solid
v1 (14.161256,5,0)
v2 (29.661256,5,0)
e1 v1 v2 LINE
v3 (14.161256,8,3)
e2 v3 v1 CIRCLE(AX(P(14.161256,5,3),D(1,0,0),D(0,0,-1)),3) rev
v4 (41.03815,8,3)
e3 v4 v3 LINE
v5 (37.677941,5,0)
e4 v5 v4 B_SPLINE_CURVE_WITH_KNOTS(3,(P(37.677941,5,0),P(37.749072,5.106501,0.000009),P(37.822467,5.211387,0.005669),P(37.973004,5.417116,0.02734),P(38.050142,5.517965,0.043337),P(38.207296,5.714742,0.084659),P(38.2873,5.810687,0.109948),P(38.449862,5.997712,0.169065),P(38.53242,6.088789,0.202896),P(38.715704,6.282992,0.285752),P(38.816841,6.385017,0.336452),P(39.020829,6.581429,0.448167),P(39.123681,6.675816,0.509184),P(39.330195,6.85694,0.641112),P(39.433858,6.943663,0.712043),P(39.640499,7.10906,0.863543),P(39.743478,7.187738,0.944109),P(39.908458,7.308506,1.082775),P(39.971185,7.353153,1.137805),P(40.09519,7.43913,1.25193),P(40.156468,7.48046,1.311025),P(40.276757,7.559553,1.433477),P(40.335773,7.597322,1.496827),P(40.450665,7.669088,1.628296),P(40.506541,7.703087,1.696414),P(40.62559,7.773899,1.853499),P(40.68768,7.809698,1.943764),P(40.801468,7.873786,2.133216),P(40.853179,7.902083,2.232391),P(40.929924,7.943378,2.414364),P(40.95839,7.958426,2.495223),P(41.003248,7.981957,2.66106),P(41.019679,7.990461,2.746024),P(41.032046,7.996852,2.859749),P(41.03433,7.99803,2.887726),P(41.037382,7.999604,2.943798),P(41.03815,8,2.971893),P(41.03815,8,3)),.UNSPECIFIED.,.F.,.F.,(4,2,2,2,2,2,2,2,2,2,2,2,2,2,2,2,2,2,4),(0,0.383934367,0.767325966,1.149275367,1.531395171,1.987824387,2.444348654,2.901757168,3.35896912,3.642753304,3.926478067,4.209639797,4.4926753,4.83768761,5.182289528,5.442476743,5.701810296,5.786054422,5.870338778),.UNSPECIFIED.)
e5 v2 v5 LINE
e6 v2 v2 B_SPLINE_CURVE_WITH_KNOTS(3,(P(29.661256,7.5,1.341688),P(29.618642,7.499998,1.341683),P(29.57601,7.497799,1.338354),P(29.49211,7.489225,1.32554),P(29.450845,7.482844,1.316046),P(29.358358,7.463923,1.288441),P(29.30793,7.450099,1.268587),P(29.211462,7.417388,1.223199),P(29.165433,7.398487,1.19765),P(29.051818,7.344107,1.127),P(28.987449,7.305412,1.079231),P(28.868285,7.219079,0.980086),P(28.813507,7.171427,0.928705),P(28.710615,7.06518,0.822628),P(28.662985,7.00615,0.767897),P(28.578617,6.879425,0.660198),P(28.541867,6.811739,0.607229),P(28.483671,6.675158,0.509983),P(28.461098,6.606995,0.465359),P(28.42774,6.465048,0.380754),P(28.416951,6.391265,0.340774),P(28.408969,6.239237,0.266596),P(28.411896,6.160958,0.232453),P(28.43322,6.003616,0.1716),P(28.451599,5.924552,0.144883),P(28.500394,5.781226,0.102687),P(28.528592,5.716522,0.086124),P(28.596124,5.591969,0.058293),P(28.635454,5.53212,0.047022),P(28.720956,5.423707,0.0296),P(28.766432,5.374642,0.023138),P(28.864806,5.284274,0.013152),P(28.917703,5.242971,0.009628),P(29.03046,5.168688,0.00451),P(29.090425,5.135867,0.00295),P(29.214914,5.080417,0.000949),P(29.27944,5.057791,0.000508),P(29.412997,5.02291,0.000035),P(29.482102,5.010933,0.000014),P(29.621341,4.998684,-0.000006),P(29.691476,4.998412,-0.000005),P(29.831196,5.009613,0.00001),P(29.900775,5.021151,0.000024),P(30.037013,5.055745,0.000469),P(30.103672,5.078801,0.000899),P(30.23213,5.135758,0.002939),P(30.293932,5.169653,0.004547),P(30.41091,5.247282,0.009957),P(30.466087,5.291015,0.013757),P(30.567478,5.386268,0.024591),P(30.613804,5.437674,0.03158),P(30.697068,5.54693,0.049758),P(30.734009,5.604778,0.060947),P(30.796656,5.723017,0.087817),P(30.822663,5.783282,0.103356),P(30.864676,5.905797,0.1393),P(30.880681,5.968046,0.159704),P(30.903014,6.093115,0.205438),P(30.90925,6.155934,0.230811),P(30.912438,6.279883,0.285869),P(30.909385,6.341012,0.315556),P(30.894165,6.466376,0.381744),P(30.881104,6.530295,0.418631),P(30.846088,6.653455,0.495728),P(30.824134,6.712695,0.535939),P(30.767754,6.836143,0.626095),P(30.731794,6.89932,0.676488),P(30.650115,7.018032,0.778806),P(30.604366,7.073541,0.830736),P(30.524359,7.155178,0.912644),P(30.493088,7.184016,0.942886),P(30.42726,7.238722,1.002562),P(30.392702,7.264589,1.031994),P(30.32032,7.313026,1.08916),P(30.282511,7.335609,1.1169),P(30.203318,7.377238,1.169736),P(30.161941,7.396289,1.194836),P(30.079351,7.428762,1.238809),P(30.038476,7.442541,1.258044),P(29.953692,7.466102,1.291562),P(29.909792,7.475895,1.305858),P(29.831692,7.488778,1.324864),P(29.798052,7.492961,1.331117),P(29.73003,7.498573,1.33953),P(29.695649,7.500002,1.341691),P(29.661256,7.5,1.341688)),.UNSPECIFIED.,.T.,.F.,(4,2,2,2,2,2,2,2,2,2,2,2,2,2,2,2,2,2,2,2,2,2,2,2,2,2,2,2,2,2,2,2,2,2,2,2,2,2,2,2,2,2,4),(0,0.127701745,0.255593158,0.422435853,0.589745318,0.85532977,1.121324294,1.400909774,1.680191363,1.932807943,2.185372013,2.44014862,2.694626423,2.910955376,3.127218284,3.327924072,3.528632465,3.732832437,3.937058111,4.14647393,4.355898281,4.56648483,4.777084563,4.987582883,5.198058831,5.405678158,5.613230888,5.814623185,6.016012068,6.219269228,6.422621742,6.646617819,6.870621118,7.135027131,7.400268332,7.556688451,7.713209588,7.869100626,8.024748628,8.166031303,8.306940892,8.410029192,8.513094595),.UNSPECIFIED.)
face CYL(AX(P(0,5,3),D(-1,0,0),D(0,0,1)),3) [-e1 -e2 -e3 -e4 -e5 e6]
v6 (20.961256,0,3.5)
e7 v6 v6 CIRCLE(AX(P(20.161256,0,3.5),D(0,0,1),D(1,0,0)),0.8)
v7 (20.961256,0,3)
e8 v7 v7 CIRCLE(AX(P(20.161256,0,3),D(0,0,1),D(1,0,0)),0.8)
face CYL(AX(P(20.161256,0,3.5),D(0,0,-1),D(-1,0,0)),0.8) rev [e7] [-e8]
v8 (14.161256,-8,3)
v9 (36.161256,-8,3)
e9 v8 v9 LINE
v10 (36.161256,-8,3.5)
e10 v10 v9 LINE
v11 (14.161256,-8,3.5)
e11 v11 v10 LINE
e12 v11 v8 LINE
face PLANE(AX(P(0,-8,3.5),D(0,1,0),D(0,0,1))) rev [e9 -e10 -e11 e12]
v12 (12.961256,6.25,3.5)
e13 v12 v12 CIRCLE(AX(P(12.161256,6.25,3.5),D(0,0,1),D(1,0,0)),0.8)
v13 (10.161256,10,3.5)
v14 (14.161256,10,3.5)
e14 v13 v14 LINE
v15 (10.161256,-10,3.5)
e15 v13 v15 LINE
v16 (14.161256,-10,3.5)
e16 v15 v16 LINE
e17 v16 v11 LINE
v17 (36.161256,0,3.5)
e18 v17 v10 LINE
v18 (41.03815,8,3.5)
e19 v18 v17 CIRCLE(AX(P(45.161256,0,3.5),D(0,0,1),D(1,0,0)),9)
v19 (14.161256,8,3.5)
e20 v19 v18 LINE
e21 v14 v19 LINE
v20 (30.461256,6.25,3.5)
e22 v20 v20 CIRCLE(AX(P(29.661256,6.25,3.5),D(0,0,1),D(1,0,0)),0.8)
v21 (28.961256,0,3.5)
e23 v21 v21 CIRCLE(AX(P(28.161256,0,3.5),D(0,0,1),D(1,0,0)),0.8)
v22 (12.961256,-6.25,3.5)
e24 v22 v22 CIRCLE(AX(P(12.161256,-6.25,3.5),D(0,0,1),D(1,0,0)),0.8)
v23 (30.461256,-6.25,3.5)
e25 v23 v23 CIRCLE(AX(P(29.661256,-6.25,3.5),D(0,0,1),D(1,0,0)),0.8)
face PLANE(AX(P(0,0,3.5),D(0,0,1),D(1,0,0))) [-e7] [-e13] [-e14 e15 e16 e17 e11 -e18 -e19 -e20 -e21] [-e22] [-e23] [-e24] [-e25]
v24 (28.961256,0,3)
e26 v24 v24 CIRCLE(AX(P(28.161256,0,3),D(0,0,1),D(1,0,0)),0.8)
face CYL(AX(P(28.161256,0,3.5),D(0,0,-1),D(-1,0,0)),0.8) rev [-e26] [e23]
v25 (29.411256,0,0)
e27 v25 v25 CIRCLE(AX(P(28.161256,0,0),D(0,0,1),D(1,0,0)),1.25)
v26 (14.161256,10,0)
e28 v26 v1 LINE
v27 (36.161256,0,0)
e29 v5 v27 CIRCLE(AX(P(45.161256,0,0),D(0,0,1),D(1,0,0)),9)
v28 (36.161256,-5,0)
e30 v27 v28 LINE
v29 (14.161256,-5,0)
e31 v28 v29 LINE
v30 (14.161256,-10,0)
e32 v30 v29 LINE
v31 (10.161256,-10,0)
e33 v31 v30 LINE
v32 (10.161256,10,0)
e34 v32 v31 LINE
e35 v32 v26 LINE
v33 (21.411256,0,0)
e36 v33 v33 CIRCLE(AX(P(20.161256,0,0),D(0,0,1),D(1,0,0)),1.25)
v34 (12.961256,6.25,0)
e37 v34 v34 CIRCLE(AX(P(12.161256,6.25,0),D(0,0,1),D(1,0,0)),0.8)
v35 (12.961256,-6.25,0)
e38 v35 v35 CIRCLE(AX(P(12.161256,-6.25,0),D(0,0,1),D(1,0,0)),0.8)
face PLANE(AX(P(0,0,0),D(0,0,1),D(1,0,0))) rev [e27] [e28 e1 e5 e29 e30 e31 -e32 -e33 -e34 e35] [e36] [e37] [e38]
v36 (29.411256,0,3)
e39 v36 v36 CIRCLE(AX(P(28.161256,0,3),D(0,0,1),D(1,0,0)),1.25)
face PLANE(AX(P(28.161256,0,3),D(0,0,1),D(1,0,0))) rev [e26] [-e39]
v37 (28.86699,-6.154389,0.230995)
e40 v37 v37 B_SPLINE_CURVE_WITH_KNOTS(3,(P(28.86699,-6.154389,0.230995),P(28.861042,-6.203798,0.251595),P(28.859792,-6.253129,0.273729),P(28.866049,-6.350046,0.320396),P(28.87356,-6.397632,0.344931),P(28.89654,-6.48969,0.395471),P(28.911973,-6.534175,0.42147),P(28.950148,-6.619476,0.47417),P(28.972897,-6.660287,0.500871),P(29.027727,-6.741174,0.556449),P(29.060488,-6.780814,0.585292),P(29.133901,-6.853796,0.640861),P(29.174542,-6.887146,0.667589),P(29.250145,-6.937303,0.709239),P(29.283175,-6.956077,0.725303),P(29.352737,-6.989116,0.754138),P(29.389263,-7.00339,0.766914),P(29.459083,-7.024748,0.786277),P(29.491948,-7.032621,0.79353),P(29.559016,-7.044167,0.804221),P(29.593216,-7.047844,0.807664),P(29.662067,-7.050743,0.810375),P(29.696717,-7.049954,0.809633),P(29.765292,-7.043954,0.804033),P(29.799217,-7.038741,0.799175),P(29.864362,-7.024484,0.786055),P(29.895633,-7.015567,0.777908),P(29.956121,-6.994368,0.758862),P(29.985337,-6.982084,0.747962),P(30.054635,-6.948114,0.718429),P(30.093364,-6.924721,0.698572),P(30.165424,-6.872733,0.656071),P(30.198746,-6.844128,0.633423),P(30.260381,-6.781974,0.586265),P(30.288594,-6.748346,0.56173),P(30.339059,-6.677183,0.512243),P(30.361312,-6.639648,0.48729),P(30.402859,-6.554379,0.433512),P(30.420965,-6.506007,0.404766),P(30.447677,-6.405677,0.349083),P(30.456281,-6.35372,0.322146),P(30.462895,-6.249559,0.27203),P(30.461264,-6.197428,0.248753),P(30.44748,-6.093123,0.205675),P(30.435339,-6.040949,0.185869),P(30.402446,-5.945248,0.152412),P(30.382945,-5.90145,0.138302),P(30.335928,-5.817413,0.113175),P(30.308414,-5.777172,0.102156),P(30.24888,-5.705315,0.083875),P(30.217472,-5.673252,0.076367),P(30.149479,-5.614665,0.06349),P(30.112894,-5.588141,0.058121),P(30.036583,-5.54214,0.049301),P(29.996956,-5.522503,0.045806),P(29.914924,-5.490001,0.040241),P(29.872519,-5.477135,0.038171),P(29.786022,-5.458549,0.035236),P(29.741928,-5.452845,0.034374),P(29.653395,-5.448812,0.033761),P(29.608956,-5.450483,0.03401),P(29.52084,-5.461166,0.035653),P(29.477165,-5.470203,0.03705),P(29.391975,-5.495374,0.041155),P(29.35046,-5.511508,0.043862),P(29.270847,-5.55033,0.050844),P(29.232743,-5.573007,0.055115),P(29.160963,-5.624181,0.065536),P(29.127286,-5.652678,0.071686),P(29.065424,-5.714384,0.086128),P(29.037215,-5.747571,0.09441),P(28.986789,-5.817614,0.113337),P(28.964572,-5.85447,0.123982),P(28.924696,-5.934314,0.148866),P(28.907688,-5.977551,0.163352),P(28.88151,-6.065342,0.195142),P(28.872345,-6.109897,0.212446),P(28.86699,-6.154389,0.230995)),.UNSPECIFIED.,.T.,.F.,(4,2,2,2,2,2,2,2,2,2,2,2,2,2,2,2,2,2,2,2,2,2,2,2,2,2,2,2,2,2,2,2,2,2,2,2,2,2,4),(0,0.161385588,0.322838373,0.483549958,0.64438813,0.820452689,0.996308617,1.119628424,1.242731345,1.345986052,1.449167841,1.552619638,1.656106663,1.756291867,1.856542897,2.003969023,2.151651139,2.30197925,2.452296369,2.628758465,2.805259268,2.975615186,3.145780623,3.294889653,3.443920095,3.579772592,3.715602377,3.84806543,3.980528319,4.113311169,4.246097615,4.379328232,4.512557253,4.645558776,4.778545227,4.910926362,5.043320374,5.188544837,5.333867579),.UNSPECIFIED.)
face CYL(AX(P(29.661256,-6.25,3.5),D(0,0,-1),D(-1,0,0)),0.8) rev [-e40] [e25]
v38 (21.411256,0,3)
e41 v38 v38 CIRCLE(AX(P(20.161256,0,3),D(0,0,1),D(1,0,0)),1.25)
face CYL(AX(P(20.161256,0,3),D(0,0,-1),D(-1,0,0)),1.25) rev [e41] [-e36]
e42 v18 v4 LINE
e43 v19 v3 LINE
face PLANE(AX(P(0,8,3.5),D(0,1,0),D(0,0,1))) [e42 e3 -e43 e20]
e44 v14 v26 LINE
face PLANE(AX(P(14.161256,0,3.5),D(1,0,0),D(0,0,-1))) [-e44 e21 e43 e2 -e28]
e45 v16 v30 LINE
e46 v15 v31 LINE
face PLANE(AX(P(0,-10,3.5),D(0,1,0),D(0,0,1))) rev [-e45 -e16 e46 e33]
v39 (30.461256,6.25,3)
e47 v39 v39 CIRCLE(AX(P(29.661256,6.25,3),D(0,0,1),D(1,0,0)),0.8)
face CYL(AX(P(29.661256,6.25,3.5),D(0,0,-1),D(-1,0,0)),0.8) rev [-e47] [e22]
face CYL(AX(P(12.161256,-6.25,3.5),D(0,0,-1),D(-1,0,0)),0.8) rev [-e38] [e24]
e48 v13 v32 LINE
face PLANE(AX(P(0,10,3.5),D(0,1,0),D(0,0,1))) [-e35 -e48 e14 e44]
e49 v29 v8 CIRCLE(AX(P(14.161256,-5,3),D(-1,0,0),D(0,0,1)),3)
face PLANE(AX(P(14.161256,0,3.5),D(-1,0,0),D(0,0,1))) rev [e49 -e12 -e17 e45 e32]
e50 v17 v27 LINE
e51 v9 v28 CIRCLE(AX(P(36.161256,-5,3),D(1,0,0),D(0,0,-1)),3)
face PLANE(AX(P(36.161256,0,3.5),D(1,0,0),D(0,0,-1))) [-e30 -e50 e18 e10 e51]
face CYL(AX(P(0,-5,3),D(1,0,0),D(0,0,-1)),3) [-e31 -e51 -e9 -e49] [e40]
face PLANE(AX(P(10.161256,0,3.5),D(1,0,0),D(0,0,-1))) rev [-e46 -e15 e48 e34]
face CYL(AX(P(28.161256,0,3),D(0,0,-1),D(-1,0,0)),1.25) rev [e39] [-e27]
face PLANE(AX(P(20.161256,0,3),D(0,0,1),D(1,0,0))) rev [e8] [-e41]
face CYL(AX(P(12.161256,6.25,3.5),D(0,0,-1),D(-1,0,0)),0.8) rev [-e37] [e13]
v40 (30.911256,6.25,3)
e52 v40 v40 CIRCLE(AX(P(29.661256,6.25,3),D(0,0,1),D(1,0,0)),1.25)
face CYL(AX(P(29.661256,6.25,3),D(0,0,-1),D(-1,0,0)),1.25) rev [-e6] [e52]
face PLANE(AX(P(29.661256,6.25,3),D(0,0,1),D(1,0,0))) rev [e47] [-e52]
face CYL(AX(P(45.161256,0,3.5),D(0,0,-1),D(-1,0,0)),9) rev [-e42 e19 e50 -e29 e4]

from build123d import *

# Parameters (mm, degrees)
SKETCH1_W           = 4
SKETCH1_H           = 2
BOSS_EXTRUDE1_DEPTH = 3.5
SKETCH2_R           = 0.8
SCREW_HOLES_DEPTH   = 43.383720665
SKETCH3_R           = 1.25
SCREW_HEADS_DEPTH   = 3
FILLET1_R           = 3


with BuildPart() as part:
    # Sketch1 → Boss-Extrude1 (new body)
    with BuildSketch(Plane.XY):
        with BuildLine():
            Line((10.161255894, 0), (36.161255894, 0))
            ThreePointArc((36.161255894, 0), (37.476597455, 4.684658438), (41.038150268, 8))
            Line((41.038150268, 8), (14.161255894, 8))
            Line((14.161255894, 8), (10.161255894, 8))
            Line((10.161255894, 8), (10.161255894, 0))
        make_face()
        Polygon((36.161255894, -8), (36.161255894, 0), (10.161255894, 0), (10.161255894, -8), (14.161255894, -8), align=None)
        with Locations((12.161255894, 9)):
            Rectangle(SKETCH1_W, SKETCH1_H)
        with Locations((12.161255894, -9)):
            Rectangle(SKETCH1_W, SKETCH1_H)
    extrude(amount=BOSS_EXTRUDE1_DEPTH)

    # Sketch2 → Screw Holes (cut, through all)
    with BuildSketch(Plane.XY):
        with Locations((20.161255894, 0)):
            Circle(SKETCH2_R)
        with Locations((12.161255894, -6.25)):
            Circle(SKETCH2_R)
        with Locations((29.661255894, 6.25)):
            Circle(SKETCH2_R)
        with Locations((29.661255894, -6.25)):
            Circle(SKETCH2_R)
        with Locations((12.161255894, 6.25)):
            Circle(SKETCH2_R)
        with Locations((28.161255894, 0)):
            Circle(SKETCH2_R)
    extrude(amount=SCREW_HOLES_DEPTH, mode=Mode.SUBTRACT)

    # Sketch3 → Screw Heads (cut)
    with BuildSketch(Plane.XY):
        with Locations((20.161255894, 0)):
            Circle(SKETCH3_R)
        with Locations((29.661255894, 6.25)):
            Circle(SKETCH3_R)
        with Locations((28.161255894, 0)):
            Circle(SKETCH3_R)
    extrude(amount=SCREW_HEADS_DEPTH, mode=Mode.SUBTRACT)

    # Fillet1
    # the kernel refuses this fillet: 3 mm, written as the material it takes off along each edge
    with BuildSketch(Plane(origin=(48.538150268, 8, 0), x_dir=(0, 0, 1), z_dir=(-1, 0, 0))) as fillet1_piece_1:
        with BuildLine():
            CenterArc((FILLET1_R, -FILLET1_R), FILLET1_R, 90, 90)
            Line((0, -FILLET1_R), (0, 0))
            Line((0, 0), (FILLET1_R, 0))
        make_face()
    extrude(amount=34.376894374, mode=Mode.SUBTRACT)
    with BuildSketch(Plane(origin=(14.161255894, -8, 0), x_dir=(0, 0, 1), z_dir=(1, 0, 0))) as fillet1_piece_2:
        with BuildLine():
            CenterArc((FILLET1_R, -FILLET1_R), FILLET1_R, 90, 90)
            Line((0, -FILLET1_R), (0, 0))
            Line((0, 0), (FILLET1_R, 0))
        make_face()
    extrude(amount=29.5, mode=Mode.SUBTRACT)


solid = part.part
